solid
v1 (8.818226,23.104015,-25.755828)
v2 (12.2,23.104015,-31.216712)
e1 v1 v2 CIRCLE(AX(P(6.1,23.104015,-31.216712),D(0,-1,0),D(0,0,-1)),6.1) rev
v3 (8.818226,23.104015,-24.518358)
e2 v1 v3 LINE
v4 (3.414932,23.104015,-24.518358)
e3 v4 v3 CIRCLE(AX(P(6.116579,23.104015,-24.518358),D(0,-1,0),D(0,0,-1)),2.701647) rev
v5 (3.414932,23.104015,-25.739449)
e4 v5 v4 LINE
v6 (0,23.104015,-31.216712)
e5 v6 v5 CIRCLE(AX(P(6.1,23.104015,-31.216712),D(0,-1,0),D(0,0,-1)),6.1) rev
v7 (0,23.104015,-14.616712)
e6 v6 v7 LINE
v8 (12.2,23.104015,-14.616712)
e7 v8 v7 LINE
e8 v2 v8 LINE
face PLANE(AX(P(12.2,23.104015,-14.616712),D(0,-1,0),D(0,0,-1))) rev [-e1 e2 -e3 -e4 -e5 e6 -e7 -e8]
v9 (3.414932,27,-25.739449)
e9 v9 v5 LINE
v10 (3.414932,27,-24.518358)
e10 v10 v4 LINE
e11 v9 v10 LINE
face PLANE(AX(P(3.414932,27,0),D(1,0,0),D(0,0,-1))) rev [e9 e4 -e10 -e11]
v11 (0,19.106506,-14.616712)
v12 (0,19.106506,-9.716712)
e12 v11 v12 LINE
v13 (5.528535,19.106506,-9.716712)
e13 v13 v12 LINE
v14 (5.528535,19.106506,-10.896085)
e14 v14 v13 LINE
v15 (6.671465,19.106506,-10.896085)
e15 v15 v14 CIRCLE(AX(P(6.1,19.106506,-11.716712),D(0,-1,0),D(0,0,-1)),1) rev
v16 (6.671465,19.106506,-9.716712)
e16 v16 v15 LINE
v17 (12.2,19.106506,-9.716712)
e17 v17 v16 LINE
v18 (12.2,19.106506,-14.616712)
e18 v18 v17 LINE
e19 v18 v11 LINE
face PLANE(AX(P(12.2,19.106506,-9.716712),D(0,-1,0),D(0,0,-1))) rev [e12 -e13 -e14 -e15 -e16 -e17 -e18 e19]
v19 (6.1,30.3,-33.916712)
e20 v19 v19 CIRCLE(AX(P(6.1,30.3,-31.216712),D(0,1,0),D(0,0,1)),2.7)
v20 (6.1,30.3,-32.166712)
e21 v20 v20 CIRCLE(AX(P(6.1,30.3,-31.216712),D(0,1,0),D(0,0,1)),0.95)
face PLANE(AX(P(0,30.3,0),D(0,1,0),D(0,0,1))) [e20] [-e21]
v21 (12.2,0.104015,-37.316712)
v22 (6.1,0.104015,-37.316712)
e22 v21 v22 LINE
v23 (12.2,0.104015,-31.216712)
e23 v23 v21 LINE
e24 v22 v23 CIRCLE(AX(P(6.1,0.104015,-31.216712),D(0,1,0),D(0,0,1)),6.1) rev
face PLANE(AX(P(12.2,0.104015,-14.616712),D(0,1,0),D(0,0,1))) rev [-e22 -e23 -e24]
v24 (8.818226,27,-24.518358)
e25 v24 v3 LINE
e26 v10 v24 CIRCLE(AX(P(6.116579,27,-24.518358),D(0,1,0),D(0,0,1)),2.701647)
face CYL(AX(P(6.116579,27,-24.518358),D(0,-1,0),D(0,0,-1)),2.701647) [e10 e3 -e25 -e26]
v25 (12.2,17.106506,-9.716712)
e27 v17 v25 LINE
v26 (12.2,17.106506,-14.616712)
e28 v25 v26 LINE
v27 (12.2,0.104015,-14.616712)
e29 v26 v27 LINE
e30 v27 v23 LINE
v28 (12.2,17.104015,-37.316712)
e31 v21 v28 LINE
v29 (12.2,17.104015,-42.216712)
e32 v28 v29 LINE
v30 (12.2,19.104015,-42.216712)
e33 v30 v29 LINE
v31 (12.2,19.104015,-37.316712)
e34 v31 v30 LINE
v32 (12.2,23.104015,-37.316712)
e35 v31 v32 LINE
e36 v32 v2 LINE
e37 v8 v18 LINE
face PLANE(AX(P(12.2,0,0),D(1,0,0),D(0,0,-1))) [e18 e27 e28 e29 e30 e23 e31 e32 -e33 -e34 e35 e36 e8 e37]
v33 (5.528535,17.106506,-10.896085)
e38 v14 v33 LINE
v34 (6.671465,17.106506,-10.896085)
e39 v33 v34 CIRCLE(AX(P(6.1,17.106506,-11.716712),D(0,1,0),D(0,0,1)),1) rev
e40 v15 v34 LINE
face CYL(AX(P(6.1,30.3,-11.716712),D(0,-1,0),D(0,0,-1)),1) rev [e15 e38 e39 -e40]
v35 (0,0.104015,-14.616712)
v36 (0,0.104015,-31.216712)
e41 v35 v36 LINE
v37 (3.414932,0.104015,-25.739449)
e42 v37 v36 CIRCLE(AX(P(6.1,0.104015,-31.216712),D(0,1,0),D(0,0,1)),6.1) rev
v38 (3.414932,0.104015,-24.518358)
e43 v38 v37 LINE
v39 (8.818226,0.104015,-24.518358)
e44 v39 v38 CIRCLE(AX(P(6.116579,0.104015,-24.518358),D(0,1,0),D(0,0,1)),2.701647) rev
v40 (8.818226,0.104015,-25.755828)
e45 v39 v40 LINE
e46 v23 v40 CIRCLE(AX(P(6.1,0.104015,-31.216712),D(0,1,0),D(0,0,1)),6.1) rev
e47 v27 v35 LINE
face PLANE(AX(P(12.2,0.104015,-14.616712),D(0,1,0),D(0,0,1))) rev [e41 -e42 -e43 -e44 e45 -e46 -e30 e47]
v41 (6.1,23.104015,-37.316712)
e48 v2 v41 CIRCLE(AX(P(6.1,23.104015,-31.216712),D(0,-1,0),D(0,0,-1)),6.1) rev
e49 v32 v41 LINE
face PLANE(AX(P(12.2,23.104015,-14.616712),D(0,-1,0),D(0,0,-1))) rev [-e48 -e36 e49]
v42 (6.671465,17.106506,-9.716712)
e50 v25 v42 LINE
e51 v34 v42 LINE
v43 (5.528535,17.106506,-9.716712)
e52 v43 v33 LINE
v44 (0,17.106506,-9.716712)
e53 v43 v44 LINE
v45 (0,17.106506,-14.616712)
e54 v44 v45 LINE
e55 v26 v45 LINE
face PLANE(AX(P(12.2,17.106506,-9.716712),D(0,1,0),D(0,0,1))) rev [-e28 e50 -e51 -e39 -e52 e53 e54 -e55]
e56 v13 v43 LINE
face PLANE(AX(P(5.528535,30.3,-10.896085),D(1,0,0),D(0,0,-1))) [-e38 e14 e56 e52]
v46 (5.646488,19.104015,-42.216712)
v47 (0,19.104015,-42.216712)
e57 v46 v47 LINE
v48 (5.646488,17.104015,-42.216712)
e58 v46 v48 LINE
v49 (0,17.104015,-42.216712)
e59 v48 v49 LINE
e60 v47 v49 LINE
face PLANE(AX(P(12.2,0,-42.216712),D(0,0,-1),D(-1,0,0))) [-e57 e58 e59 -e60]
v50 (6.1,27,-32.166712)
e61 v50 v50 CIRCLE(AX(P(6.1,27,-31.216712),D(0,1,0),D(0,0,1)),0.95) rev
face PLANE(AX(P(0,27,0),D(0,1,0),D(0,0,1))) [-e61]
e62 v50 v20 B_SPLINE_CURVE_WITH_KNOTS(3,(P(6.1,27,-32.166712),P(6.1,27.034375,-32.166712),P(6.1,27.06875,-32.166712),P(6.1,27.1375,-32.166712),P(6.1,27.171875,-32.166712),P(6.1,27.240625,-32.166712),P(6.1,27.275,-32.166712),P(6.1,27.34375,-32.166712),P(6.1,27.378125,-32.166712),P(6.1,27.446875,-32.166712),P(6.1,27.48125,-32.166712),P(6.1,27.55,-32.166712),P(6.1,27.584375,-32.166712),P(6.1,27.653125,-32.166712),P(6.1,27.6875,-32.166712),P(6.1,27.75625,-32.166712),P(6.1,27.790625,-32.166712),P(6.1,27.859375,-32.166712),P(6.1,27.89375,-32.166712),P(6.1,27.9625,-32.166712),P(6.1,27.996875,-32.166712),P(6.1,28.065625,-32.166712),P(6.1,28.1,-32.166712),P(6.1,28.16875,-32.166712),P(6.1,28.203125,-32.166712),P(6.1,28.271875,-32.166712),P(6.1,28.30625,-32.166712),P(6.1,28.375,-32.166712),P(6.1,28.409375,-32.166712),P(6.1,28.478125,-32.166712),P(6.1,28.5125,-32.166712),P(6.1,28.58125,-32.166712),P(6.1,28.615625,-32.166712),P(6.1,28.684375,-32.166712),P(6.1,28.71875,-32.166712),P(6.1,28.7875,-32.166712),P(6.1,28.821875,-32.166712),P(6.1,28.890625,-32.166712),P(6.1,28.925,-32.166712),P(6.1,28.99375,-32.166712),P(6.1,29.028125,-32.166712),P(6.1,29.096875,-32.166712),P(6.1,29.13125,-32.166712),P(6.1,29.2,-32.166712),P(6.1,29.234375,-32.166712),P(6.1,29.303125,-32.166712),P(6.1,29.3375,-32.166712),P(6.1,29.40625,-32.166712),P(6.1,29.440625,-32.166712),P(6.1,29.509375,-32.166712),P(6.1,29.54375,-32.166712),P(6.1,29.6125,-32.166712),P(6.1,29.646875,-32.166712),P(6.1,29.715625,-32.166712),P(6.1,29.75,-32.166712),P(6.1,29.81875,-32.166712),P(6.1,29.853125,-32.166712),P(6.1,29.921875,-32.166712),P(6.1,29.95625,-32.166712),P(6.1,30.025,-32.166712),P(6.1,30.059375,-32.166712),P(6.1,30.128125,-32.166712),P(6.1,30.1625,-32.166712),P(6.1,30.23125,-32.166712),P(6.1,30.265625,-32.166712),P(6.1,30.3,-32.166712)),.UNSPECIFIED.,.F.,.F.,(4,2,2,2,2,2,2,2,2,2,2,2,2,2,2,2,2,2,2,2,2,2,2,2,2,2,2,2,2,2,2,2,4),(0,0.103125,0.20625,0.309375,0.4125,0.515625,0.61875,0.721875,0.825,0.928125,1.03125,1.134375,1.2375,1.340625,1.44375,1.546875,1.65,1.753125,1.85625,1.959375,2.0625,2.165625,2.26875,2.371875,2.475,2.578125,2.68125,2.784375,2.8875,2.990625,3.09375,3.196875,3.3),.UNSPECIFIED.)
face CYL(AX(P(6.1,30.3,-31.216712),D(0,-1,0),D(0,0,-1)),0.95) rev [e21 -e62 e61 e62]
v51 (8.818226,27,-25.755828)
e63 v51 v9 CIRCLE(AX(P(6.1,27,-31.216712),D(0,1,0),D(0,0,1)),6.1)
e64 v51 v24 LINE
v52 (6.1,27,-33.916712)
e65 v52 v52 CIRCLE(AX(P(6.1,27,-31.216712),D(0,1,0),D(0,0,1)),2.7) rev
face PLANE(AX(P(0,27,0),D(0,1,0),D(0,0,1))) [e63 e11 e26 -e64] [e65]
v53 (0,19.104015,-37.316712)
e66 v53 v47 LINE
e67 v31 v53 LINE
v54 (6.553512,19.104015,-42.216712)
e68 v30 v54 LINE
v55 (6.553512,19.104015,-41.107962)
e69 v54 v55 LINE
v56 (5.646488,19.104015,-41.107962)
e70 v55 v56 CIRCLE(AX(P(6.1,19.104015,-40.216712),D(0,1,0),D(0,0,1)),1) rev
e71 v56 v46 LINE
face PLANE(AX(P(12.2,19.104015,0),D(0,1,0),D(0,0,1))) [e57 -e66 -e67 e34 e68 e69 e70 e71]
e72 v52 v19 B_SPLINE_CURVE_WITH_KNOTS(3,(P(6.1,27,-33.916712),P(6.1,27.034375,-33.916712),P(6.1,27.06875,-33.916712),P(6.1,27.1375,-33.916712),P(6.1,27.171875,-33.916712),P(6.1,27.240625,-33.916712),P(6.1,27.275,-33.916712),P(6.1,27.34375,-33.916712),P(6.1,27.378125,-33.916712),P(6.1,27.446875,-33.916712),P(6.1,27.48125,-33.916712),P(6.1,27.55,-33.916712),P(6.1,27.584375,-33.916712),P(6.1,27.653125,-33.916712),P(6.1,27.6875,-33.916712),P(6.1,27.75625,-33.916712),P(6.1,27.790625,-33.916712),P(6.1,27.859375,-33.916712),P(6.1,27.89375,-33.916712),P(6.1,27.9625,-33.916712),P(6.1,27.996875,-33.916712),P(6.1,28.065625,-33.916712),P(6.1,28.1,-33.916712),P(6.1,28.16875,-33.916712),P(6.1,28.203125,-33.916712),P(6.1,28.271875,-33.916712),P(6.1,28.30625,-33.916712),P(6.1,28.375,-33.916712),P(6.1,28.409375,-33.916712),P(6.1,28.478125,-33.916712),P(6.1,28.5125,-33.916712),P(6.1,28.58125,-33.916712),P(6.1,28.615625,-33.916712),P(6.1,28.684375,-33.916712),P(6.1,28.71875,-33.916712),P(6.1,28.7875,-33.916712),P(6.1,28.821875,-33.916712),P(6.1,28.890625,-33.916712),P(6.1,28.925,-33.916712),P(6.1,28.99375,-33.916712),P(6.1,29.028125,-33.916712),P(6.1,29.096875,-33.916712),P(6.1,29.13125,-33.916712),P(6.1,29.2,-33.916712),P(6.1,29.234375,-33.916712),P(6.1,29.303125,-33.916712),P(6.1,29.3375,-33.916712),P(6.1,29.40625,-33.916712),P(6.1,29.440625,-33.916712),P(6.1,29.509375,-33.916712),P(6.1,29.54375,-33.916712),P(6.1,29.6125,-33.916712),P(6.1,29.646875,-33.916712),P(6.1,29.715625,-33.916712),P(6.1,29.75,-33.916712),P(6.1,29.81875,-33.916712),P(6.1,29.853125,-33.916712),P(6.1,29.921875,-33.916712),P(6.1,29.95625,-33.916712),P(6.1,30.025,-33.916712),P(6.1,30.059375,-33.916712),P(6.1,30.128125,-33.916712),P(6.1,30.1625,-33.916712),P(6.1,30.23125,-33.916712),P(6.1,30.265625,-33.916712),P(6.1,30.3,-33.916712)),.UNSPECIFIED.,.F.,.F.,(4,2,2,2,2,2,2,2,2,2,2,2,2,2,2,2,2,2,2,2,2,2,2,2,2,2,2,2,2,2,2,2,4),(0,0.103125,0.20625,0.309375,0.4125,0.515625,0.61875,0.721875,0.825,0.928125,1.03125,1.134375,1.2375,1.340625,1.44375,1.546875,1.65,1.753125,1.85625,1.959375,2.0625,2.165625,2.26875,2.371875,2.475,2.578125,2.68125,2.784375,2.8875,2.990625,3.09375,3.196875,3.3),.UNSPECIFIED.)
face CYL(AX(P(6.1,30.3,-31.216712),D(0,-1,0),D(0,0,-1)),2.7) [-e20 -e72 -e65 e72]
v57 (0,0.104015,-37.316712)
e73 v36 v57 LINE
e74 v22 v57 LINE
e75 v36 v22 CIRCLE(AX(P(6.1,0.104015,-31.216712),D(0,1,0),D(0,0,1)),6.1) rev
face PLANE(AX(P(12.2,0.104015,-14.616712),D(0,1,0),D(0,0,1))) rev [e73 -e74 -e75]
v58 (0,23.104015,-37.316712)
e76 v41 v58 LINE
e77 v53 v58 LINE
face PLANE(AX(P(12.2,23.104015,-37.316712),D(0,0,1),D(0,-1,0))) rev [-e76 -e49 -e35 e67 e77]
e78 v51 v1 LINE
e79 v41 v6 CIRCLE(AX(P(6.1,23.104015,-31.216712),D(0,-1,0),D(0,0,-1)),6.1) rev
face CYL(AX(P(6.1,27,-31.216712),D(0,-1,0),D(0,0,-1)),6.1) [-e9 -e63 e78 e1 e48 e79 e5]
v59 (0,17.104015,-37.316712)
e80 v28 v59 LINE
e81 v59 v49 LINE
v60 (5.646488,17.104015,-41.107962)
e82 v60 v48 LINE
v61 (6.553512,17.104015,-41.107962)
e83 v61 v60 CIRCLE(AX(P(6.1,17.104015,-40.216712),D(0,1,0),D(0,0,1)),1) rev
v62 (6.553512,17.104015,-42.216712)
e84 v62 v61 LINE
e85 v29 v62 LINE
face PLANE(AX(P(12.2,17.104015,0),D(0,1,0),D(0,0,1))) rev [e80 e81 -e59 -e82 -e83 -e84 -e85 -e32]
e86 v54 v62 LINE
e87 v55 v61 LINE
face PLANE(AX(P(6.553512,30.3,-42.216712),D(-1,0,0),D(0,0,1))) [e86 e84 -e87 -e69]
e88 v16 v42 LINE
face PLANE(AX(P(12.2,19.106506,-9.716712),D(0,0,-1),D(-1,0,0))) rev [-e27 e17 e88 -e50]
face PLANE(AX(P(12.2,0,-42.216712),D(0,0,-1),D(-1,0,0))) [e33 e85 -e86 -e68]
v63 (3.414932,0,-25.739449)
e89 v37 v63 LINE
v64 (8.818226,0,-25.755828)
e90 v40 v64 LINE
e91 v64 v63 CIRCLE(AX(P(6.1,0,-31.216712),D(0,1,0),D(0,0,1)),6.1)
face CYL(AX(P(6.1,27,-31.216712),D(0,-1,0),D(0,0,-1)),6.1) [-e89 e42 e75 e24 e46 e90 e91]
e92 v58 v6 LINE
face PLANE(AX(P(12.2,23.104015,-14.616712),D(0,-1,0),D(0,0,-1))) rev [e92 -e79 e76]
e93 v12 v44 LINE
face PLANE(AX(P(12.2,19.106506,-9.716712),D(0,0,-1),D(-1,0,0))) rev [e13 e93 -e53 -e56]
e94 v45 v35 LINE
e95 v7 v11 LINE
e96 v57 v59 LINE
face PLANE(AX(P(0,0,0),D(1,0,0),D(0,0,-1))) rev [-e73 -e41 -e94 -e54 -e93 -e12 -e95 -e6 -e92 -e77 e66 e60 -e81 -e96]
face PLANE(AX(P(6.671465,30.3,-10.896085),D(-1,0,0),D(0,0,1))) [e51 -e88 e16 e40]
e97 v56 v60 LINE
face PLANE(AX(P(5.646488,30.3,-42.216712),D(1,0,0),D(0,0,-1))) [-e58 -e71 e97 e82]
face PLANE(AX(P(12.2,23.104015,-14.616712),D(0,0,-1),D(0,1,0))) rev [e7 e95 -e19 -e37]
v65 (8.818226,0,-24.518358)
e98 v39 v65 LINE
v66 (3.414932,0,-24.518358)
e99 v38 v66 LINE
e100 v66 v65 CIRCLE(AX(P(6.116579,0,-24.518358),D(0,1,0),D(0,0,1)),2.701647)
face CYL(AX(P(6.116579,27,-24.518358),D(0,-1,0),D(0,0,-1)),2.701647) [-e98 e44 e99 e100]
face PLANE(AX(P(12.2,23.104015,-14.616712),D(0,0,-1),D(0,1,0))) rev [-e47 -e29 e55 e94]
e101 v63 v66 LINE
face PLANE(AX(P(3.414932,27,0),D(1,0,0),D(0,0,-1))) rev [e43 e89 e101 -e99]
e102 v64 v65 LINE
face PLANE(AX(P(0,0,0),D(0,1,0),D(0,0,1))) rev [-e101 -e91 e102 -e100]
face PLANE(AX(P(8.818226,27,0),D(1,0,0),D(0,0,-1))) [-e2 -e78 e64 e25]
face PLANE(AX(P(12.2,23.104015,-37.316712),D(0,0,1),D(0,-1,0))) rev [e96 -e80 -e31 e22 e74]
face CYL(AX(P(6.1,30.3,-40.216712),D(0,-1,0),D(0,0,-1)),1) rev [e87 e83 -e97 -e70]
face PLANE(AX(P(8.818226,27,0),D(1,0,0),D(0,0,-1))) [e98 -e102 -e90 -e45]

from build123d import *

# Parameters (mm, degrees)
SKETCH2_W               = 22.7
SKETCH2_H               = 23
BOSS_EXTRUDE1_DEPTH     = 12.2
BOSS_EXTRUDE2_START     = 17.106506393
BOSS_EXTRUDE2_OUTLINE_W = 12.2
BOSS_EXTRUDE2_OUTLINE_H = 4.9
BOSS_EXTRUDE2_DEPTH     = 2
SKETCH5_W               = 4.9
SKETCH5_H               = 2
BOSS_EXTRUDE4_DEPTH     = 12.2
SKETCH11_R              = 2.7
SKETCH11_R_2            = 0.95
BOSS_EXTRUDE6_DEPTH     = 27
SKETCH11_4_R            = 2.7
SKETCH11_4_R_2          = 0.95
BOSS_EXTRUDE7_DEPTH     = 30.3
CUT_EXTRUDE3_DEPTH      = 30.3
CUT_EXTRUDE4_DEPTH      = 30.3


# Read off the part's stored shape, not the designer's step: Boss-Extrude2
with BuildPart() as part:
    # Sketch2 → Boss-Extrude1 (new body)
    with BuildSketch(Plane(origin=(0, 0, 0), x_dir=(0, 0, -1), z_dir=(1, 0, 0))):
        with Locations((25.966711769, 11.60401504)):
            Rectangle(SKETCH2_W, SKETCH2_H)
    extrude(amount=BOSS_EXTRUDE1_DEPTH)

    # Boss-Extrude2 outline → Boss-Extrude2 (add)
    with BuildSketch(Plane(origin=(0, 0, 0), x_dir=(1, 0, 0), z_dir=(0, 1, 0)).offset(BOSS_EXTRUDE2_START)):
        with Locations((6.1, 12.166711769)):
            Rectangle(BOSS_EXTRUDE2_OUTLINE_W, BOSS_EXTRUDE2_OUTLINE_H)
    extrude(amount=BOSS_EXTRUDE2_DEPTH)

    # Sketch5 → Boss-Extrude4 (add)
    with BuildSketch(Plane(origin=(0, 0, 0), x_dir=(0, 0, -1), z_dir=(1, 0, 0))):
        with Locations((39.766711769, 18.10401504)):
            Rectangle(SKETCH5_W, SKETCH5_H)
    extrude(amount=BOSS_EXTRUDE4_DEPTH)

    # Sketch11 → Boss-Extrude6 (add)
    # profile 1 of 3: a face of its own
    with BuildSketch(Plane(origin=(0, 0, 0), x_dir=(1, 0, 0), z_dir=(0, 1, 0))):
        with BuildLine():
            ThreePointArc((8.818225568, 25.755828163), (6.081508494, 37.316683741), (3.414932422, 25.739448575))
            Line((3.414932422, 25.739448575), (3.414932422, 24.518358342))
            ThreePointArc((3.414932422, 24.518358342), (6.116578995, 21.816711769), (8.818225568, 24.518358342))
            Line((8.818225568, 24.518358342), (8.818225568, 25.755828163))
        make_face()
        with Locations((6.1, 31.216711769)):
            Circle(SKETCH11_R, mode=Mode.SUBTRACT)
    # profile 2 of 3: a face of its own
    with BuildSketch(Plane(origin=(0, 0, 0), x_dir=(1, 0, 0), z_dir=(0, 1, 0))):
        with Locations((6.1, 31.216711769)):
            Circle(SKETCH11_R)
        with Locations((6.1, 31.216711769)):
            Circle(SKETCH11_R_2, mode=Mode.SUBTRACT)
    # profile 3 of 3: a face of its own
    with BuildSketch(Plane(origin=(0, 0, 0), x_dir=(1, 0, 0), z_dir=(0, 1, 0))):
        with Locations((6.1, 31.216711769)):
            Circle(SKETCH11_R_2)
    extrude(amount=BOSS_EXTRUDE6_DEPTH)

    # Sketch11<4> → Boss-Extrude7 (add)
    with BuildSketch(Plane(origin=(0, 0, 0), x_dir=(1, 0, 0), z_dir=(0, 1, 0))):
        with Locations(Location((6.1, 31.216711769, 0), (0, 0, 90))):
            Circle(SKETCH11_4_R)
        with Locations(Location((6.1, 31.216711769, 0), (0, 0, 90))):
            Circle(SKETCH11_4_R_2, mode=Mode.SUBTRACT)
    extrude(amount=BOSS_EXTRUDE7_DEPTH)

    # Sketch13 → Cut-Extrude3 (cut)
    with BuildSketch(Plane(origin=(0, 0, 0), x_dir=(1, 0, 0), z_dir=(0, 1, 0))):
        with BuildLine():
            Line((5.528535179, 10.896085205), (5.528535179, 9.716711769))
            Line((5.528535179, 9.716711769), (6.671464821, 9.716711769))
            Line((6.671464821, 9.716711769), (6.671464821, 10.896085205))
            ThreePointArc((6.671464821, 10.896085205), (6.1, 12.716711769), (5.528535179, 10.896085205))
        make_face()
    extrude(amount=CUT_EXTRUDE3_DEPTH, mode=Mode.SUBTRACT)

    # Sketch16 → Cut-Extrude4 (cut)
    with BuildSketch(Plane(origin=(0, 0, 0), x_dir=(1, 0, 0), z_dir=(0, 1, 0))):
        with BuildLine():
            Line((5.646488236, 42.216711769), (6.553511764, 42.216711769))
            Line((6.553511764, 42.216711769), (6.553511764, 41.107962059))
            ThreePointArc((6.553511764, 41.107962059), (6.1, 39.216711769), (5.646488236, 41.107962059))
            Line((5.646488236, 41.107962059), (5.646488236, 42.216711769))
        make_face()
    extrude(amount=CUT_EXTRUDE4_DEPTH, mode=Mode.SUBTRACT)


solid = part.part
